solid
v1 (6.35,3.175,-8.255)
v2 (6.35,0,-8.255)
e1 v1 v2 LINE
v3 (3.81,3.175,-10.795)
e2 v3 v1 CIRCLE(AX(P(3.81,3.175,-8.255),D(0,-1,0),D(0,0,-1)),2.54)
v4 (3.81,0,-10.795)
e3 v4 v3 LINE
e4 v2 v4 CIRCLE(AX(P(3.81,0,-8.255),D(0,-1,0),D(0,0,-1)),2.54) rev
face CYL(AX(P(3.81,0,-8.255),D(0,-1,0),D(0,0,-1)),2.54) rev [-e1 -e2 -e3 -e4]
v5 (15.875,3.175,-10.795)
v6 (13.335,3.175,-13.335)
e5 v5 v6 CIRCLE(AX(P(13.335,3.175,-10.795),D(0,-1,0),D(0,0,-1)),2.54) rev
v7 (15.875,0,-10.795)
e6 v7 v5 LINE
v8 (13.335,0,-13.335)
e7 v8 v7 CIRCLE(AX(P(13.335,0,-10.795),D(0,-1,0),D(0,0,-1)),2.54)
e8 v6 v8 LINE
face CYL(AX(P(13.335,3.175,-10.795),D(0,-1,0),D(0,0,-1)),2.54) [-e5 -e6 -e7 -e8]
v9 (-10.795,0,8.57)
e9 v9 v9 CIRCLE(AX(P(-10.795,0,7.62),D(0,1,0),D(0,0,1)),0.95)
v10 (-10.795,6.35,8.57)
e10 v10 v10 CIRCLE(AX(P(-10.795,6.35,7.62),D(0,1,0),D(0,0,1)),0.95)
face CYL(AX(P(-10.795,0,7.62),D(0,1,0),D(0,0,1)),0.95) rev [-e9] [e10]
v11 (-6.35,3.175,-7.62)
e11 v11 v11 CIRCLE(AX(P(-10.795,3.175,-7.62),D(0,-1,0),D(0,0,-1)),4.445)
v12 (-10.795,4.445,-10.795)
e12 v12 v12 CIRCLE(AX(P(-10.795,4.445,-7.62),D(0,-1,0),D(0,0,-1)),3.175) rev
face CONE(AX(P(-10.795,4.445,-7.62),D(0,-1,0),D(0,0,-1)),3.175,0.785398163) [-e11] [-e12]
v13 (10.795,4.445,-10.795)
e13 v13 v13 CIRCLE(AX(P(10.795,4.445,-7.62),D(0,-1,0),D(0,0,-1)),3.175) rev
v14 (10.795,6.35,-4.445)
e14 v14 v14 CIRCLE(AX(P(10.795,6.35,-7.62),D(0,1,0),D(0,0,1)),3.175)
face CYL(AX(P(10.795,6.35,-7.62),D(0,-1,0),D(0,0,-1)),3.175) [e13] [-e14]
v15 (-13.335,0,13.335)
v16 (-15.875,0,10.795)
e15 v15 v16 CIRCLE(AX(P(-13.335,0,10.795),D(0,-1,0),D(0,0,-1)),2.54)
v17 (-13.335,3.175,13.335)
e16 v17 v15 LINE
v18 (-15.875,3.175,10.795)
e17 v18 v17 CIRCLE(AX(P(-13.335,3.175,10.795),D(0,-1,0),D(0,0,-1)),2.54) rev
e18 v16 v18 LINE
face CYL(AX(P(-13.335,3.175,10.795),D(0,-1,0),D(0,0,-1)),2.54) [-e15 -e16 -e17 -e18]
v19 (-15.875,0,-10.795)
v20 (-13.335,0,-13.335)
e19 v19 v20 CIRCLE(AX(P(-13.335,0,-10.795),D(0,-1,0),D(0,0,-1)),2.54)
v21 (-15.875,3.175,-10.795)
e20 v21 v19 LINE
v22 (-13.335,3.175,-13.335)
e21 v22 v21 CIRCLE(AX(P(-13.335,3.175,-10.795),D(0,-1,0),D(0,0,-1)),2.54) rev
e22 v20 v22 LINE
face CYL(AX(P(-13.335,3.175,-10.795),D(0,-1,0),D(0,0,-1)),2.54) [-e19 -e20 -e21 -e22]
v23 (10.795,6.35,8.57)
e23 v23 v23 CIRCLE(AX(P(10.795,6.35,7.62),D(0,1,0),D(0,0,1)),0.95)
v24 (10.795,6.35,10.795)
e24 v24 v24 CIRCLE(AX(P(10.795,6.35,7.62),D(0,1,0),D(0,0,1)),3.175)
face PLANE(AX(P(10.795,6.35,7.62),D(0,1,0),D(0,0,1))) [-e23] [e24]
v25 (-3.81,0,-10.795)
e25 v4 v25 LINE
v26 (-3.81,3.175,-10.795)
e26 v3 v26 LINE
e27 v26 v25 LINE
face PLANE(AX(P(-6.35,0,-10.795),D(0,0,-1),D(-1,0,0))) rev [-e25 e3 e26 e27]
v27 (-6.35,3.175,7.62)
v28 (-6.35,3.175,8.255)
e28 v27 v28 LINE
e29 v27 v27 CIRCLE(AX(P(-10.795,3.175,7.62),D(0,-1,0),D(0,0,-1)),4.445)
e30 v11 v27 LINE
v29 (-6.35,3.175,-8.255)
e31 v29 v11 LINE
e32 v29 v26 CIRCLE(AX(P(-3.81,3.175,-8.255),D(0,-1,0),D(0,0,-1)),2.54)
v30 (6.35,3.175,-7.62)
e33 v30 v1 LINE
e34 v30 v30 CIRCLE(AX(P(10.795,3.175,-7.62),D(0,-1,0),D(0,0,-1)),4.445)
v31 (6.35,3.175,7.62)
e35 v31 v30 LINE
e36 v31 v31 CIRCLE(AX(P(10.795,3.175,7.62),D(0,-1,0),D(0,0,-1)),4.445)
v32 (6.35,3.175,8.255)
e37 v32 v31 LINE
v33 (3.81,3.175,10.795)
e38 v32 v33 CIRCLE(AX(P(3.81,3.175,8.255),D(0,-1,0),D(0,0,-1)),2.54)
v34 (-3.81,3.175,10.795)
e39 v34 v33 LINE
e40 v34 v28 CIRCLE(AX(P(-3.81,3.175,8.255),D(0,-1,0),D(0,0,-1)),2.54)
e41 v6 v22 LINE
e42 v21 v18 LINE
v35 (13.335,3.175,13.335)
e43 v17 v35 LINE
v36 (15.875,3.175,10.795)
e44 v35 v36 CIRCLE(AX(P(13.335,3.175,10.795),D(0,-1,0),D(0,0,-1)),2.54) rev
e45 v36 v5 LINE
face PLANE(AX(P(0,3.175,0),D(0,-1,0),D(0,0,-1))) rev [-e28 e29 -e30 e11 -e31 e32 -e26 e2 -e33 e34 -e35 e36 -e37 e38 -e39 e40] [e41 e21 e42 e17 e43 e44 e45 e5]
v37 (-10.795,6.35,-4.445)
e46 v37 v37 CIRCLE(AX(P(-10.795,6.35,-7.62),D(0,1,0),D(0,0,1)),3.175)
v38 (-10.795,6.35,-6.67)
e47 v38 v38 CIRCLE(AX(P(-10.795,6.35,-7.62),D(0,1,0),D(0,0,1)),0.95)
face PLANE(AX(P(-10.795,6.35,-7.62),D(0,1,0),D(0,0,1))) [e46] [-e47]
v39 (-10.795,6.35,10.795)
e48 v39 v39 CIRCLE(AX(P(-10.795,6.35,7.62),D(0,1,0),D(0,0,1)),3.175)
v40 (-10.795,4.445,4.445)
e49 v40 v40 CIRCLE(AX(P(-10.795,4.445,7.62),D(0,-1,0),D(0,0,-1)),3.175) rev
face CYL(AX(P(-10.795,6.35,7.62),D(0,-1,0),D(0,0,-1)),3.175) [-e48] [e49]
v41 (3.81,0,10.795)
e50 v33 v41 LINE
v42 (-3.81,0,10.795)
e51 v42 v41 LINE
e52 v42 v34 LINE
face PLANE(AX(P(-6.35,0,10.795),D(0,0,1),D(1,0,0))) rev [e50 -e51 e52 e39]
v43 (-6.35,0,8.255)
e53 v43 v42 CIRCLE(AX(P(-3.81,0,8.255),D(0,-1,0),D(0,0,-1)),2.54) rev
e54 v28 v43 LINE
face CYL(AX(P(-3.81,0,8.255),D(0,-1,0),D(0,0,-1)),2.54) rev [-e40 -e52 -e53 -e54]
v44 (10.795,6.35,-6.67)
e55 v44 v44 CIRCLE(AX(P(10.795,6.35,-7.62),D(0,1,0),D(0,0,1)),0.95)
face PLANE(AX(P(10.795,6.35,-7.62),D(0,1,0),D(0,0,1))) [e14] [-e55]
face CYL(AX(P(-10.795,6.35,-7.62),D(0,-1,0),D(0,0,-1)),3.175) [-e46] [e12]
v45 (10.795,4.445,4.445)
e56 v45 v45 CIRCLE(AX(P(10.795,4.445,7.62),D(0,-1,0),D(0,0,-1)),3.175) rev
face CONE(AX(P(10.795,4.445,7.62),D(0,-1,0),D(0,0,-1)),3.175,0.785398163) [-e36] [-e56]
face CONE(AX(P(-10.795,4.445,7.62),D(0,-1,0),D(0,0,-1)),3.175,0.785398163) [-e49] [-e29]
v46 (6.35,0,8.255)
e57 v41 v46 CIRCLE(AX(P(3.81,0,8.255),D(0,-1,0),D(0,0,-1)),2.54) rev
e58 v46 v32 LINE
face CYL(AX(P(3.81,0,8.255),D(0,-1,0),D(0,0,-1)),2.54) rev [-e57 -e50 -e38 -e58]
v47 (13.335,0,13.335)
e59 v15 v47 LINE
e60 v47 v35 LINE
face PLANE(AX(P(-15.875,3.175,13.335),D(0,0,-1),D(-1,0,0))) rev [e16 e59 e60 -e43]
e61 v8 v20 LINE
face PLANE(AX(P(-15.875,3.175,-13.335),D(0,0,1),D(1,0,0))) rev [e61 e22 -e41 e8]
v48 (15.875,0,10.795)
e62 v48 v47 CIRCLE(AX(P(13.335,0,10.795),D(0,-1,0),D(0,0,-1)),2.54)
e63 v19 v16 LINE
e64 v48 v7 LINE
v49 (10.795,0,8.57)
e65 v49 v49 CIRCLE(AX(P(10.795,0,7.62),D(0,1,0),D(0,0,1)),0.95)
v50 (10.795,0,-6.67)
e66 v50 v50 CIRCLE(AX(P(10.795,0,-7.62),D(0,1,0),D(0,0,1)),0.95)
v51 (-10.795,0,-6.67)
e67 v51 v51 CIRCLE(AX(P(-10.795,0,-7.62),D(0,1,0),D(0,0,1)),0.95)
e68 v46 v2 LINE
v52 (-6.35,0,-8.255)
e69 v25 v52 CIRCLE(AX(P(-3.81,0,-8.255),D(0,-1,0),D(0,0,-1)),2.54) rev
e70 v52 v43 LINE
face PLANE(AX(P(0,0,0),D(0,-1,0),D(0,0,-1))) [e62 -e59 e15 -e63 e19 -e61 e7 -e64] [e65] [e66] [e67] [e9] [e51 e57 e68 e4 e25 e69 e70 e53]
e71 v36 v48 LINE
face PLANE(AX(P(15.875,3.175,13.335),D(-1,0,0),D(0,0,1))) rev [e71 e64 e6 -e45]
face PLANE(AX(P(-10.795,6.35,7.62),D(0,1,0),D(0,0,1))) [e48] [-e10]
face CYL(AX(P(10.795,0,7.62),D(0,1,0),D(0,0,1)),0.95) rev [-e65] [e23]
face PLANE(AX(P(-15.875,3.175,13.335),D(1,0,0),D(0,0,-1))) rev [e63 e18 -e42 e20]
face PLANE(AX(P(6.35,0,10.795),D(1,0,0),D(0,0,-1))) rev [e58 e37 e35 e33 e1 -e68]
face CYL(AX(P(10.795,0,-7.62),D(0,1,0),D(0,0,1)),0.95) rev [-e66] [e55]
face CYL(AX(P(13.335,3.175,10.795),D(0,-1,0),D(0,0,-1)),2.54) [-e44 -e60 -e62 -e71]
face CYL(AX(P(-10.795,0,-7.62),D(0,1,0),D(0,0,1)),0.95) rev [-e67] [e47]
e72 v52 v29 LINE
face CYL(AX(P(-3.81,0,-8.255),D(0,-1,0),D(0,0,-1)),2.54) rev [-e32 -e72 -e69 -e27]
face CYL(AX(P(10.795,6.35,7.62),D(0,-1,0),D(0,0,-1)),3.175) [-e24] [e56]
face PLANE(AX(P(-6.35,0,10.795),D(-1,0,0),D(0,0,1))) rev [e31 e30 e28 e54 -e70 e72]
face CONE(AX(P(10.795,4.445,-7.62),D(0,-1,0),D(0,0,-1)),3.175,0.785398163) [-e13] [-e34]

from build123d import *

# Parameters (mm, degrees)
SKETCH1_W           = 31.75
SKETCH1_H           = 26.67
BOSS_EXTRUDE1_DEPTH = 3.175
SKETCH2_R           = 0.95
CUT_EXTRUDE1_DEPTH  = 21.974233597
BOSS_EXTRUDE2_START = 3.175
SKETCH3_R           = 3.175
SKETCH3_R_2         = 0.95
BOSS_EXTRUDE2_DEPTH = 3.175
SKETCH4_W           = 12.7
SKETCH4_H           = 21.59
CUT_EXTRUDE2_DEPTH  = 21.974233597
FILLET1_R           = 2.54
CHAMFER1_SIZE       = 1.27


with BuildPart() as part:
    # Sketch1 → Boss-Extrude1 (new body)
    with BuildSketch(Plane(origin=(0, 0, 0), x_dir=(1, 0, 0), z_dir=(0, 1, 0))):
        Rectangle(SKETCH1_W, SKETCH1_H)
    extrude(amount=BOSS_EXTRUDE1_DEPTH)

    # Sketch2 → Cut-Extrude1 (cut, through all)
    with BuildSketch(Plane(origin=(0, 3.175, 0), x_dir=(1, 0, 0), z_dir=(0, 1, 0))):
        with Locations(Location((-10.795, 7.62, 0), (0, 0, 270))):
            Circle(SKETCH2_R)
        with Locations(Location((10.795, 7.62, 0), (0, 0, 270))):
            Circle(SKETCH2_R)
        with Locations(Location((10.795, -7.62, 0), (0, 0, 270))):
            Circle(SKETCH2_R)
        with Locations(Location((-10.795, -7.62, 0), (0, 0, 270))):
            Circle(SKETCH2_R)
    extrude(amount=-CUT_EXTRUDE1_DEPTH, mode=Mode.SUBTRACT)

    # Sketch3 → Boss-Extrude2 (add)
    # profile 1 of 4: a face of its own
    with BuildSketch(Plane(origin=(0, 3.175, 0), x_dir=(1, 0, 0), z_dir=(0, 1, 0)).offset(BOSS_EXTRUDE2_START)):
        with Locations(Location((-10.795, 7.62, 0), (0, 0, 90))):
            Circle(SKETCH3_R)
        with Locations(Location((-10.795, 7.62, 0), (0, 0, 270))):
            Circle(SKETCH3_R_2, mode=Mode.SUBTRACT)
    # profile 2 of 4: a face of its own
    with BuildSketch(Plane(origin=(0, 3.175, 0), x_dir=(1, 0, 0), z_dir=(0, 1, 0)).offset(BOSS_EXTRUDE2_START)):
        with Locations(Location((10.795, 7.62, 0), (0, 0, 90))):
            Circle(SKETCH3_R)
        with Locations(Location((10.795, 7.62, 0), (0, 0, 270))):
            Circle(SKETCH3_R_2, mode=Mode.SUBTRACT)
    # profile 3 of 4: a face of its own
    with BuildSketch(Plane(origin=(0, 3.175, 0), x_dir=(1, 0, 0), z_dir=(0, 1, 0)).offset(BOSS_EXTRUDE2_START)):
        with Locations(Location((10.795, -7.62, 0), (0, 0, 90))):
            Circle(SKETCH3_R)
        with Locations(Location((10.795, -7.62, 0), (0, 0, 270))):
            Circle(SKETCH3_R_2, mode=Mode.SUBTRACT)
    # profile 4 of 4: a face of its own
    with BuildSketch(Plane(origin=(0, 3.175, 0), x_dir=(1, 0, 0), z_dir=(0, 1, 0)).offset(BOSS_EXTRUDE2_START)):
        with Locations(Location((-10.795, -7.62, 0), (0, 0, 90))):
            Circle(SKETCH3_R)
        with Locations(Location((-10.795, -7.62, 0), (0, 0, 270))):
            Circle(SKETCH3_R_2, mode=Mode.SUBTRACT)
    extrude(amount=-BOSS_EXTRUDE2_DEPTH)

    # Sketch4 → Cut-Extrude2 (cut, through all)
    with BuildSketch(Plane(origin=(0, 3.175, 0), x_dir=(1, 0, 0), z_dir=(0, 1, 0))):
        Rectangle(SKETCH4_W, SKETCH4_H)
    extrude(amount=-CUT_EXTRUDE2_DEPTH, mode=Mode.SUBTRACT)

    # Fillet1
    fillet1_edges = [part.edges().sort_by_distance(p)[0] for p in [
        (6.35, 1.5875, -10.795),
        (6.35, 1.5875, 10.795),
        (-6.35, 1.5875, 10.795),
        (-6.35, 1.5875, -10.795),
        (15.875, 1.5875, 13.335),
        (-15.875, 1.5875, 13.335),
        (-15.875, 1.5875, -13.335),
        (15.875, 1.5875, -13.335),
    ]]
    fillet(fillet1_edges, radius=FILLET1_R)

    # Chamfer1
    chamfer1_edges = [part.edges().sort_by_distance(p)[0] for p in [
        (-10.795, 3.175, -4.445),
        (10.795, 3.175, -4.445),
        (10.795, 3.175, 10.795),
        (-10.795, 3.175, 10.795),
    ]]
    chamfer(chamfer1_edges, length=CHAMFER1_SIZE - 0.0001)  # a hair under: the kernel refuses the full size


solid = part.part
